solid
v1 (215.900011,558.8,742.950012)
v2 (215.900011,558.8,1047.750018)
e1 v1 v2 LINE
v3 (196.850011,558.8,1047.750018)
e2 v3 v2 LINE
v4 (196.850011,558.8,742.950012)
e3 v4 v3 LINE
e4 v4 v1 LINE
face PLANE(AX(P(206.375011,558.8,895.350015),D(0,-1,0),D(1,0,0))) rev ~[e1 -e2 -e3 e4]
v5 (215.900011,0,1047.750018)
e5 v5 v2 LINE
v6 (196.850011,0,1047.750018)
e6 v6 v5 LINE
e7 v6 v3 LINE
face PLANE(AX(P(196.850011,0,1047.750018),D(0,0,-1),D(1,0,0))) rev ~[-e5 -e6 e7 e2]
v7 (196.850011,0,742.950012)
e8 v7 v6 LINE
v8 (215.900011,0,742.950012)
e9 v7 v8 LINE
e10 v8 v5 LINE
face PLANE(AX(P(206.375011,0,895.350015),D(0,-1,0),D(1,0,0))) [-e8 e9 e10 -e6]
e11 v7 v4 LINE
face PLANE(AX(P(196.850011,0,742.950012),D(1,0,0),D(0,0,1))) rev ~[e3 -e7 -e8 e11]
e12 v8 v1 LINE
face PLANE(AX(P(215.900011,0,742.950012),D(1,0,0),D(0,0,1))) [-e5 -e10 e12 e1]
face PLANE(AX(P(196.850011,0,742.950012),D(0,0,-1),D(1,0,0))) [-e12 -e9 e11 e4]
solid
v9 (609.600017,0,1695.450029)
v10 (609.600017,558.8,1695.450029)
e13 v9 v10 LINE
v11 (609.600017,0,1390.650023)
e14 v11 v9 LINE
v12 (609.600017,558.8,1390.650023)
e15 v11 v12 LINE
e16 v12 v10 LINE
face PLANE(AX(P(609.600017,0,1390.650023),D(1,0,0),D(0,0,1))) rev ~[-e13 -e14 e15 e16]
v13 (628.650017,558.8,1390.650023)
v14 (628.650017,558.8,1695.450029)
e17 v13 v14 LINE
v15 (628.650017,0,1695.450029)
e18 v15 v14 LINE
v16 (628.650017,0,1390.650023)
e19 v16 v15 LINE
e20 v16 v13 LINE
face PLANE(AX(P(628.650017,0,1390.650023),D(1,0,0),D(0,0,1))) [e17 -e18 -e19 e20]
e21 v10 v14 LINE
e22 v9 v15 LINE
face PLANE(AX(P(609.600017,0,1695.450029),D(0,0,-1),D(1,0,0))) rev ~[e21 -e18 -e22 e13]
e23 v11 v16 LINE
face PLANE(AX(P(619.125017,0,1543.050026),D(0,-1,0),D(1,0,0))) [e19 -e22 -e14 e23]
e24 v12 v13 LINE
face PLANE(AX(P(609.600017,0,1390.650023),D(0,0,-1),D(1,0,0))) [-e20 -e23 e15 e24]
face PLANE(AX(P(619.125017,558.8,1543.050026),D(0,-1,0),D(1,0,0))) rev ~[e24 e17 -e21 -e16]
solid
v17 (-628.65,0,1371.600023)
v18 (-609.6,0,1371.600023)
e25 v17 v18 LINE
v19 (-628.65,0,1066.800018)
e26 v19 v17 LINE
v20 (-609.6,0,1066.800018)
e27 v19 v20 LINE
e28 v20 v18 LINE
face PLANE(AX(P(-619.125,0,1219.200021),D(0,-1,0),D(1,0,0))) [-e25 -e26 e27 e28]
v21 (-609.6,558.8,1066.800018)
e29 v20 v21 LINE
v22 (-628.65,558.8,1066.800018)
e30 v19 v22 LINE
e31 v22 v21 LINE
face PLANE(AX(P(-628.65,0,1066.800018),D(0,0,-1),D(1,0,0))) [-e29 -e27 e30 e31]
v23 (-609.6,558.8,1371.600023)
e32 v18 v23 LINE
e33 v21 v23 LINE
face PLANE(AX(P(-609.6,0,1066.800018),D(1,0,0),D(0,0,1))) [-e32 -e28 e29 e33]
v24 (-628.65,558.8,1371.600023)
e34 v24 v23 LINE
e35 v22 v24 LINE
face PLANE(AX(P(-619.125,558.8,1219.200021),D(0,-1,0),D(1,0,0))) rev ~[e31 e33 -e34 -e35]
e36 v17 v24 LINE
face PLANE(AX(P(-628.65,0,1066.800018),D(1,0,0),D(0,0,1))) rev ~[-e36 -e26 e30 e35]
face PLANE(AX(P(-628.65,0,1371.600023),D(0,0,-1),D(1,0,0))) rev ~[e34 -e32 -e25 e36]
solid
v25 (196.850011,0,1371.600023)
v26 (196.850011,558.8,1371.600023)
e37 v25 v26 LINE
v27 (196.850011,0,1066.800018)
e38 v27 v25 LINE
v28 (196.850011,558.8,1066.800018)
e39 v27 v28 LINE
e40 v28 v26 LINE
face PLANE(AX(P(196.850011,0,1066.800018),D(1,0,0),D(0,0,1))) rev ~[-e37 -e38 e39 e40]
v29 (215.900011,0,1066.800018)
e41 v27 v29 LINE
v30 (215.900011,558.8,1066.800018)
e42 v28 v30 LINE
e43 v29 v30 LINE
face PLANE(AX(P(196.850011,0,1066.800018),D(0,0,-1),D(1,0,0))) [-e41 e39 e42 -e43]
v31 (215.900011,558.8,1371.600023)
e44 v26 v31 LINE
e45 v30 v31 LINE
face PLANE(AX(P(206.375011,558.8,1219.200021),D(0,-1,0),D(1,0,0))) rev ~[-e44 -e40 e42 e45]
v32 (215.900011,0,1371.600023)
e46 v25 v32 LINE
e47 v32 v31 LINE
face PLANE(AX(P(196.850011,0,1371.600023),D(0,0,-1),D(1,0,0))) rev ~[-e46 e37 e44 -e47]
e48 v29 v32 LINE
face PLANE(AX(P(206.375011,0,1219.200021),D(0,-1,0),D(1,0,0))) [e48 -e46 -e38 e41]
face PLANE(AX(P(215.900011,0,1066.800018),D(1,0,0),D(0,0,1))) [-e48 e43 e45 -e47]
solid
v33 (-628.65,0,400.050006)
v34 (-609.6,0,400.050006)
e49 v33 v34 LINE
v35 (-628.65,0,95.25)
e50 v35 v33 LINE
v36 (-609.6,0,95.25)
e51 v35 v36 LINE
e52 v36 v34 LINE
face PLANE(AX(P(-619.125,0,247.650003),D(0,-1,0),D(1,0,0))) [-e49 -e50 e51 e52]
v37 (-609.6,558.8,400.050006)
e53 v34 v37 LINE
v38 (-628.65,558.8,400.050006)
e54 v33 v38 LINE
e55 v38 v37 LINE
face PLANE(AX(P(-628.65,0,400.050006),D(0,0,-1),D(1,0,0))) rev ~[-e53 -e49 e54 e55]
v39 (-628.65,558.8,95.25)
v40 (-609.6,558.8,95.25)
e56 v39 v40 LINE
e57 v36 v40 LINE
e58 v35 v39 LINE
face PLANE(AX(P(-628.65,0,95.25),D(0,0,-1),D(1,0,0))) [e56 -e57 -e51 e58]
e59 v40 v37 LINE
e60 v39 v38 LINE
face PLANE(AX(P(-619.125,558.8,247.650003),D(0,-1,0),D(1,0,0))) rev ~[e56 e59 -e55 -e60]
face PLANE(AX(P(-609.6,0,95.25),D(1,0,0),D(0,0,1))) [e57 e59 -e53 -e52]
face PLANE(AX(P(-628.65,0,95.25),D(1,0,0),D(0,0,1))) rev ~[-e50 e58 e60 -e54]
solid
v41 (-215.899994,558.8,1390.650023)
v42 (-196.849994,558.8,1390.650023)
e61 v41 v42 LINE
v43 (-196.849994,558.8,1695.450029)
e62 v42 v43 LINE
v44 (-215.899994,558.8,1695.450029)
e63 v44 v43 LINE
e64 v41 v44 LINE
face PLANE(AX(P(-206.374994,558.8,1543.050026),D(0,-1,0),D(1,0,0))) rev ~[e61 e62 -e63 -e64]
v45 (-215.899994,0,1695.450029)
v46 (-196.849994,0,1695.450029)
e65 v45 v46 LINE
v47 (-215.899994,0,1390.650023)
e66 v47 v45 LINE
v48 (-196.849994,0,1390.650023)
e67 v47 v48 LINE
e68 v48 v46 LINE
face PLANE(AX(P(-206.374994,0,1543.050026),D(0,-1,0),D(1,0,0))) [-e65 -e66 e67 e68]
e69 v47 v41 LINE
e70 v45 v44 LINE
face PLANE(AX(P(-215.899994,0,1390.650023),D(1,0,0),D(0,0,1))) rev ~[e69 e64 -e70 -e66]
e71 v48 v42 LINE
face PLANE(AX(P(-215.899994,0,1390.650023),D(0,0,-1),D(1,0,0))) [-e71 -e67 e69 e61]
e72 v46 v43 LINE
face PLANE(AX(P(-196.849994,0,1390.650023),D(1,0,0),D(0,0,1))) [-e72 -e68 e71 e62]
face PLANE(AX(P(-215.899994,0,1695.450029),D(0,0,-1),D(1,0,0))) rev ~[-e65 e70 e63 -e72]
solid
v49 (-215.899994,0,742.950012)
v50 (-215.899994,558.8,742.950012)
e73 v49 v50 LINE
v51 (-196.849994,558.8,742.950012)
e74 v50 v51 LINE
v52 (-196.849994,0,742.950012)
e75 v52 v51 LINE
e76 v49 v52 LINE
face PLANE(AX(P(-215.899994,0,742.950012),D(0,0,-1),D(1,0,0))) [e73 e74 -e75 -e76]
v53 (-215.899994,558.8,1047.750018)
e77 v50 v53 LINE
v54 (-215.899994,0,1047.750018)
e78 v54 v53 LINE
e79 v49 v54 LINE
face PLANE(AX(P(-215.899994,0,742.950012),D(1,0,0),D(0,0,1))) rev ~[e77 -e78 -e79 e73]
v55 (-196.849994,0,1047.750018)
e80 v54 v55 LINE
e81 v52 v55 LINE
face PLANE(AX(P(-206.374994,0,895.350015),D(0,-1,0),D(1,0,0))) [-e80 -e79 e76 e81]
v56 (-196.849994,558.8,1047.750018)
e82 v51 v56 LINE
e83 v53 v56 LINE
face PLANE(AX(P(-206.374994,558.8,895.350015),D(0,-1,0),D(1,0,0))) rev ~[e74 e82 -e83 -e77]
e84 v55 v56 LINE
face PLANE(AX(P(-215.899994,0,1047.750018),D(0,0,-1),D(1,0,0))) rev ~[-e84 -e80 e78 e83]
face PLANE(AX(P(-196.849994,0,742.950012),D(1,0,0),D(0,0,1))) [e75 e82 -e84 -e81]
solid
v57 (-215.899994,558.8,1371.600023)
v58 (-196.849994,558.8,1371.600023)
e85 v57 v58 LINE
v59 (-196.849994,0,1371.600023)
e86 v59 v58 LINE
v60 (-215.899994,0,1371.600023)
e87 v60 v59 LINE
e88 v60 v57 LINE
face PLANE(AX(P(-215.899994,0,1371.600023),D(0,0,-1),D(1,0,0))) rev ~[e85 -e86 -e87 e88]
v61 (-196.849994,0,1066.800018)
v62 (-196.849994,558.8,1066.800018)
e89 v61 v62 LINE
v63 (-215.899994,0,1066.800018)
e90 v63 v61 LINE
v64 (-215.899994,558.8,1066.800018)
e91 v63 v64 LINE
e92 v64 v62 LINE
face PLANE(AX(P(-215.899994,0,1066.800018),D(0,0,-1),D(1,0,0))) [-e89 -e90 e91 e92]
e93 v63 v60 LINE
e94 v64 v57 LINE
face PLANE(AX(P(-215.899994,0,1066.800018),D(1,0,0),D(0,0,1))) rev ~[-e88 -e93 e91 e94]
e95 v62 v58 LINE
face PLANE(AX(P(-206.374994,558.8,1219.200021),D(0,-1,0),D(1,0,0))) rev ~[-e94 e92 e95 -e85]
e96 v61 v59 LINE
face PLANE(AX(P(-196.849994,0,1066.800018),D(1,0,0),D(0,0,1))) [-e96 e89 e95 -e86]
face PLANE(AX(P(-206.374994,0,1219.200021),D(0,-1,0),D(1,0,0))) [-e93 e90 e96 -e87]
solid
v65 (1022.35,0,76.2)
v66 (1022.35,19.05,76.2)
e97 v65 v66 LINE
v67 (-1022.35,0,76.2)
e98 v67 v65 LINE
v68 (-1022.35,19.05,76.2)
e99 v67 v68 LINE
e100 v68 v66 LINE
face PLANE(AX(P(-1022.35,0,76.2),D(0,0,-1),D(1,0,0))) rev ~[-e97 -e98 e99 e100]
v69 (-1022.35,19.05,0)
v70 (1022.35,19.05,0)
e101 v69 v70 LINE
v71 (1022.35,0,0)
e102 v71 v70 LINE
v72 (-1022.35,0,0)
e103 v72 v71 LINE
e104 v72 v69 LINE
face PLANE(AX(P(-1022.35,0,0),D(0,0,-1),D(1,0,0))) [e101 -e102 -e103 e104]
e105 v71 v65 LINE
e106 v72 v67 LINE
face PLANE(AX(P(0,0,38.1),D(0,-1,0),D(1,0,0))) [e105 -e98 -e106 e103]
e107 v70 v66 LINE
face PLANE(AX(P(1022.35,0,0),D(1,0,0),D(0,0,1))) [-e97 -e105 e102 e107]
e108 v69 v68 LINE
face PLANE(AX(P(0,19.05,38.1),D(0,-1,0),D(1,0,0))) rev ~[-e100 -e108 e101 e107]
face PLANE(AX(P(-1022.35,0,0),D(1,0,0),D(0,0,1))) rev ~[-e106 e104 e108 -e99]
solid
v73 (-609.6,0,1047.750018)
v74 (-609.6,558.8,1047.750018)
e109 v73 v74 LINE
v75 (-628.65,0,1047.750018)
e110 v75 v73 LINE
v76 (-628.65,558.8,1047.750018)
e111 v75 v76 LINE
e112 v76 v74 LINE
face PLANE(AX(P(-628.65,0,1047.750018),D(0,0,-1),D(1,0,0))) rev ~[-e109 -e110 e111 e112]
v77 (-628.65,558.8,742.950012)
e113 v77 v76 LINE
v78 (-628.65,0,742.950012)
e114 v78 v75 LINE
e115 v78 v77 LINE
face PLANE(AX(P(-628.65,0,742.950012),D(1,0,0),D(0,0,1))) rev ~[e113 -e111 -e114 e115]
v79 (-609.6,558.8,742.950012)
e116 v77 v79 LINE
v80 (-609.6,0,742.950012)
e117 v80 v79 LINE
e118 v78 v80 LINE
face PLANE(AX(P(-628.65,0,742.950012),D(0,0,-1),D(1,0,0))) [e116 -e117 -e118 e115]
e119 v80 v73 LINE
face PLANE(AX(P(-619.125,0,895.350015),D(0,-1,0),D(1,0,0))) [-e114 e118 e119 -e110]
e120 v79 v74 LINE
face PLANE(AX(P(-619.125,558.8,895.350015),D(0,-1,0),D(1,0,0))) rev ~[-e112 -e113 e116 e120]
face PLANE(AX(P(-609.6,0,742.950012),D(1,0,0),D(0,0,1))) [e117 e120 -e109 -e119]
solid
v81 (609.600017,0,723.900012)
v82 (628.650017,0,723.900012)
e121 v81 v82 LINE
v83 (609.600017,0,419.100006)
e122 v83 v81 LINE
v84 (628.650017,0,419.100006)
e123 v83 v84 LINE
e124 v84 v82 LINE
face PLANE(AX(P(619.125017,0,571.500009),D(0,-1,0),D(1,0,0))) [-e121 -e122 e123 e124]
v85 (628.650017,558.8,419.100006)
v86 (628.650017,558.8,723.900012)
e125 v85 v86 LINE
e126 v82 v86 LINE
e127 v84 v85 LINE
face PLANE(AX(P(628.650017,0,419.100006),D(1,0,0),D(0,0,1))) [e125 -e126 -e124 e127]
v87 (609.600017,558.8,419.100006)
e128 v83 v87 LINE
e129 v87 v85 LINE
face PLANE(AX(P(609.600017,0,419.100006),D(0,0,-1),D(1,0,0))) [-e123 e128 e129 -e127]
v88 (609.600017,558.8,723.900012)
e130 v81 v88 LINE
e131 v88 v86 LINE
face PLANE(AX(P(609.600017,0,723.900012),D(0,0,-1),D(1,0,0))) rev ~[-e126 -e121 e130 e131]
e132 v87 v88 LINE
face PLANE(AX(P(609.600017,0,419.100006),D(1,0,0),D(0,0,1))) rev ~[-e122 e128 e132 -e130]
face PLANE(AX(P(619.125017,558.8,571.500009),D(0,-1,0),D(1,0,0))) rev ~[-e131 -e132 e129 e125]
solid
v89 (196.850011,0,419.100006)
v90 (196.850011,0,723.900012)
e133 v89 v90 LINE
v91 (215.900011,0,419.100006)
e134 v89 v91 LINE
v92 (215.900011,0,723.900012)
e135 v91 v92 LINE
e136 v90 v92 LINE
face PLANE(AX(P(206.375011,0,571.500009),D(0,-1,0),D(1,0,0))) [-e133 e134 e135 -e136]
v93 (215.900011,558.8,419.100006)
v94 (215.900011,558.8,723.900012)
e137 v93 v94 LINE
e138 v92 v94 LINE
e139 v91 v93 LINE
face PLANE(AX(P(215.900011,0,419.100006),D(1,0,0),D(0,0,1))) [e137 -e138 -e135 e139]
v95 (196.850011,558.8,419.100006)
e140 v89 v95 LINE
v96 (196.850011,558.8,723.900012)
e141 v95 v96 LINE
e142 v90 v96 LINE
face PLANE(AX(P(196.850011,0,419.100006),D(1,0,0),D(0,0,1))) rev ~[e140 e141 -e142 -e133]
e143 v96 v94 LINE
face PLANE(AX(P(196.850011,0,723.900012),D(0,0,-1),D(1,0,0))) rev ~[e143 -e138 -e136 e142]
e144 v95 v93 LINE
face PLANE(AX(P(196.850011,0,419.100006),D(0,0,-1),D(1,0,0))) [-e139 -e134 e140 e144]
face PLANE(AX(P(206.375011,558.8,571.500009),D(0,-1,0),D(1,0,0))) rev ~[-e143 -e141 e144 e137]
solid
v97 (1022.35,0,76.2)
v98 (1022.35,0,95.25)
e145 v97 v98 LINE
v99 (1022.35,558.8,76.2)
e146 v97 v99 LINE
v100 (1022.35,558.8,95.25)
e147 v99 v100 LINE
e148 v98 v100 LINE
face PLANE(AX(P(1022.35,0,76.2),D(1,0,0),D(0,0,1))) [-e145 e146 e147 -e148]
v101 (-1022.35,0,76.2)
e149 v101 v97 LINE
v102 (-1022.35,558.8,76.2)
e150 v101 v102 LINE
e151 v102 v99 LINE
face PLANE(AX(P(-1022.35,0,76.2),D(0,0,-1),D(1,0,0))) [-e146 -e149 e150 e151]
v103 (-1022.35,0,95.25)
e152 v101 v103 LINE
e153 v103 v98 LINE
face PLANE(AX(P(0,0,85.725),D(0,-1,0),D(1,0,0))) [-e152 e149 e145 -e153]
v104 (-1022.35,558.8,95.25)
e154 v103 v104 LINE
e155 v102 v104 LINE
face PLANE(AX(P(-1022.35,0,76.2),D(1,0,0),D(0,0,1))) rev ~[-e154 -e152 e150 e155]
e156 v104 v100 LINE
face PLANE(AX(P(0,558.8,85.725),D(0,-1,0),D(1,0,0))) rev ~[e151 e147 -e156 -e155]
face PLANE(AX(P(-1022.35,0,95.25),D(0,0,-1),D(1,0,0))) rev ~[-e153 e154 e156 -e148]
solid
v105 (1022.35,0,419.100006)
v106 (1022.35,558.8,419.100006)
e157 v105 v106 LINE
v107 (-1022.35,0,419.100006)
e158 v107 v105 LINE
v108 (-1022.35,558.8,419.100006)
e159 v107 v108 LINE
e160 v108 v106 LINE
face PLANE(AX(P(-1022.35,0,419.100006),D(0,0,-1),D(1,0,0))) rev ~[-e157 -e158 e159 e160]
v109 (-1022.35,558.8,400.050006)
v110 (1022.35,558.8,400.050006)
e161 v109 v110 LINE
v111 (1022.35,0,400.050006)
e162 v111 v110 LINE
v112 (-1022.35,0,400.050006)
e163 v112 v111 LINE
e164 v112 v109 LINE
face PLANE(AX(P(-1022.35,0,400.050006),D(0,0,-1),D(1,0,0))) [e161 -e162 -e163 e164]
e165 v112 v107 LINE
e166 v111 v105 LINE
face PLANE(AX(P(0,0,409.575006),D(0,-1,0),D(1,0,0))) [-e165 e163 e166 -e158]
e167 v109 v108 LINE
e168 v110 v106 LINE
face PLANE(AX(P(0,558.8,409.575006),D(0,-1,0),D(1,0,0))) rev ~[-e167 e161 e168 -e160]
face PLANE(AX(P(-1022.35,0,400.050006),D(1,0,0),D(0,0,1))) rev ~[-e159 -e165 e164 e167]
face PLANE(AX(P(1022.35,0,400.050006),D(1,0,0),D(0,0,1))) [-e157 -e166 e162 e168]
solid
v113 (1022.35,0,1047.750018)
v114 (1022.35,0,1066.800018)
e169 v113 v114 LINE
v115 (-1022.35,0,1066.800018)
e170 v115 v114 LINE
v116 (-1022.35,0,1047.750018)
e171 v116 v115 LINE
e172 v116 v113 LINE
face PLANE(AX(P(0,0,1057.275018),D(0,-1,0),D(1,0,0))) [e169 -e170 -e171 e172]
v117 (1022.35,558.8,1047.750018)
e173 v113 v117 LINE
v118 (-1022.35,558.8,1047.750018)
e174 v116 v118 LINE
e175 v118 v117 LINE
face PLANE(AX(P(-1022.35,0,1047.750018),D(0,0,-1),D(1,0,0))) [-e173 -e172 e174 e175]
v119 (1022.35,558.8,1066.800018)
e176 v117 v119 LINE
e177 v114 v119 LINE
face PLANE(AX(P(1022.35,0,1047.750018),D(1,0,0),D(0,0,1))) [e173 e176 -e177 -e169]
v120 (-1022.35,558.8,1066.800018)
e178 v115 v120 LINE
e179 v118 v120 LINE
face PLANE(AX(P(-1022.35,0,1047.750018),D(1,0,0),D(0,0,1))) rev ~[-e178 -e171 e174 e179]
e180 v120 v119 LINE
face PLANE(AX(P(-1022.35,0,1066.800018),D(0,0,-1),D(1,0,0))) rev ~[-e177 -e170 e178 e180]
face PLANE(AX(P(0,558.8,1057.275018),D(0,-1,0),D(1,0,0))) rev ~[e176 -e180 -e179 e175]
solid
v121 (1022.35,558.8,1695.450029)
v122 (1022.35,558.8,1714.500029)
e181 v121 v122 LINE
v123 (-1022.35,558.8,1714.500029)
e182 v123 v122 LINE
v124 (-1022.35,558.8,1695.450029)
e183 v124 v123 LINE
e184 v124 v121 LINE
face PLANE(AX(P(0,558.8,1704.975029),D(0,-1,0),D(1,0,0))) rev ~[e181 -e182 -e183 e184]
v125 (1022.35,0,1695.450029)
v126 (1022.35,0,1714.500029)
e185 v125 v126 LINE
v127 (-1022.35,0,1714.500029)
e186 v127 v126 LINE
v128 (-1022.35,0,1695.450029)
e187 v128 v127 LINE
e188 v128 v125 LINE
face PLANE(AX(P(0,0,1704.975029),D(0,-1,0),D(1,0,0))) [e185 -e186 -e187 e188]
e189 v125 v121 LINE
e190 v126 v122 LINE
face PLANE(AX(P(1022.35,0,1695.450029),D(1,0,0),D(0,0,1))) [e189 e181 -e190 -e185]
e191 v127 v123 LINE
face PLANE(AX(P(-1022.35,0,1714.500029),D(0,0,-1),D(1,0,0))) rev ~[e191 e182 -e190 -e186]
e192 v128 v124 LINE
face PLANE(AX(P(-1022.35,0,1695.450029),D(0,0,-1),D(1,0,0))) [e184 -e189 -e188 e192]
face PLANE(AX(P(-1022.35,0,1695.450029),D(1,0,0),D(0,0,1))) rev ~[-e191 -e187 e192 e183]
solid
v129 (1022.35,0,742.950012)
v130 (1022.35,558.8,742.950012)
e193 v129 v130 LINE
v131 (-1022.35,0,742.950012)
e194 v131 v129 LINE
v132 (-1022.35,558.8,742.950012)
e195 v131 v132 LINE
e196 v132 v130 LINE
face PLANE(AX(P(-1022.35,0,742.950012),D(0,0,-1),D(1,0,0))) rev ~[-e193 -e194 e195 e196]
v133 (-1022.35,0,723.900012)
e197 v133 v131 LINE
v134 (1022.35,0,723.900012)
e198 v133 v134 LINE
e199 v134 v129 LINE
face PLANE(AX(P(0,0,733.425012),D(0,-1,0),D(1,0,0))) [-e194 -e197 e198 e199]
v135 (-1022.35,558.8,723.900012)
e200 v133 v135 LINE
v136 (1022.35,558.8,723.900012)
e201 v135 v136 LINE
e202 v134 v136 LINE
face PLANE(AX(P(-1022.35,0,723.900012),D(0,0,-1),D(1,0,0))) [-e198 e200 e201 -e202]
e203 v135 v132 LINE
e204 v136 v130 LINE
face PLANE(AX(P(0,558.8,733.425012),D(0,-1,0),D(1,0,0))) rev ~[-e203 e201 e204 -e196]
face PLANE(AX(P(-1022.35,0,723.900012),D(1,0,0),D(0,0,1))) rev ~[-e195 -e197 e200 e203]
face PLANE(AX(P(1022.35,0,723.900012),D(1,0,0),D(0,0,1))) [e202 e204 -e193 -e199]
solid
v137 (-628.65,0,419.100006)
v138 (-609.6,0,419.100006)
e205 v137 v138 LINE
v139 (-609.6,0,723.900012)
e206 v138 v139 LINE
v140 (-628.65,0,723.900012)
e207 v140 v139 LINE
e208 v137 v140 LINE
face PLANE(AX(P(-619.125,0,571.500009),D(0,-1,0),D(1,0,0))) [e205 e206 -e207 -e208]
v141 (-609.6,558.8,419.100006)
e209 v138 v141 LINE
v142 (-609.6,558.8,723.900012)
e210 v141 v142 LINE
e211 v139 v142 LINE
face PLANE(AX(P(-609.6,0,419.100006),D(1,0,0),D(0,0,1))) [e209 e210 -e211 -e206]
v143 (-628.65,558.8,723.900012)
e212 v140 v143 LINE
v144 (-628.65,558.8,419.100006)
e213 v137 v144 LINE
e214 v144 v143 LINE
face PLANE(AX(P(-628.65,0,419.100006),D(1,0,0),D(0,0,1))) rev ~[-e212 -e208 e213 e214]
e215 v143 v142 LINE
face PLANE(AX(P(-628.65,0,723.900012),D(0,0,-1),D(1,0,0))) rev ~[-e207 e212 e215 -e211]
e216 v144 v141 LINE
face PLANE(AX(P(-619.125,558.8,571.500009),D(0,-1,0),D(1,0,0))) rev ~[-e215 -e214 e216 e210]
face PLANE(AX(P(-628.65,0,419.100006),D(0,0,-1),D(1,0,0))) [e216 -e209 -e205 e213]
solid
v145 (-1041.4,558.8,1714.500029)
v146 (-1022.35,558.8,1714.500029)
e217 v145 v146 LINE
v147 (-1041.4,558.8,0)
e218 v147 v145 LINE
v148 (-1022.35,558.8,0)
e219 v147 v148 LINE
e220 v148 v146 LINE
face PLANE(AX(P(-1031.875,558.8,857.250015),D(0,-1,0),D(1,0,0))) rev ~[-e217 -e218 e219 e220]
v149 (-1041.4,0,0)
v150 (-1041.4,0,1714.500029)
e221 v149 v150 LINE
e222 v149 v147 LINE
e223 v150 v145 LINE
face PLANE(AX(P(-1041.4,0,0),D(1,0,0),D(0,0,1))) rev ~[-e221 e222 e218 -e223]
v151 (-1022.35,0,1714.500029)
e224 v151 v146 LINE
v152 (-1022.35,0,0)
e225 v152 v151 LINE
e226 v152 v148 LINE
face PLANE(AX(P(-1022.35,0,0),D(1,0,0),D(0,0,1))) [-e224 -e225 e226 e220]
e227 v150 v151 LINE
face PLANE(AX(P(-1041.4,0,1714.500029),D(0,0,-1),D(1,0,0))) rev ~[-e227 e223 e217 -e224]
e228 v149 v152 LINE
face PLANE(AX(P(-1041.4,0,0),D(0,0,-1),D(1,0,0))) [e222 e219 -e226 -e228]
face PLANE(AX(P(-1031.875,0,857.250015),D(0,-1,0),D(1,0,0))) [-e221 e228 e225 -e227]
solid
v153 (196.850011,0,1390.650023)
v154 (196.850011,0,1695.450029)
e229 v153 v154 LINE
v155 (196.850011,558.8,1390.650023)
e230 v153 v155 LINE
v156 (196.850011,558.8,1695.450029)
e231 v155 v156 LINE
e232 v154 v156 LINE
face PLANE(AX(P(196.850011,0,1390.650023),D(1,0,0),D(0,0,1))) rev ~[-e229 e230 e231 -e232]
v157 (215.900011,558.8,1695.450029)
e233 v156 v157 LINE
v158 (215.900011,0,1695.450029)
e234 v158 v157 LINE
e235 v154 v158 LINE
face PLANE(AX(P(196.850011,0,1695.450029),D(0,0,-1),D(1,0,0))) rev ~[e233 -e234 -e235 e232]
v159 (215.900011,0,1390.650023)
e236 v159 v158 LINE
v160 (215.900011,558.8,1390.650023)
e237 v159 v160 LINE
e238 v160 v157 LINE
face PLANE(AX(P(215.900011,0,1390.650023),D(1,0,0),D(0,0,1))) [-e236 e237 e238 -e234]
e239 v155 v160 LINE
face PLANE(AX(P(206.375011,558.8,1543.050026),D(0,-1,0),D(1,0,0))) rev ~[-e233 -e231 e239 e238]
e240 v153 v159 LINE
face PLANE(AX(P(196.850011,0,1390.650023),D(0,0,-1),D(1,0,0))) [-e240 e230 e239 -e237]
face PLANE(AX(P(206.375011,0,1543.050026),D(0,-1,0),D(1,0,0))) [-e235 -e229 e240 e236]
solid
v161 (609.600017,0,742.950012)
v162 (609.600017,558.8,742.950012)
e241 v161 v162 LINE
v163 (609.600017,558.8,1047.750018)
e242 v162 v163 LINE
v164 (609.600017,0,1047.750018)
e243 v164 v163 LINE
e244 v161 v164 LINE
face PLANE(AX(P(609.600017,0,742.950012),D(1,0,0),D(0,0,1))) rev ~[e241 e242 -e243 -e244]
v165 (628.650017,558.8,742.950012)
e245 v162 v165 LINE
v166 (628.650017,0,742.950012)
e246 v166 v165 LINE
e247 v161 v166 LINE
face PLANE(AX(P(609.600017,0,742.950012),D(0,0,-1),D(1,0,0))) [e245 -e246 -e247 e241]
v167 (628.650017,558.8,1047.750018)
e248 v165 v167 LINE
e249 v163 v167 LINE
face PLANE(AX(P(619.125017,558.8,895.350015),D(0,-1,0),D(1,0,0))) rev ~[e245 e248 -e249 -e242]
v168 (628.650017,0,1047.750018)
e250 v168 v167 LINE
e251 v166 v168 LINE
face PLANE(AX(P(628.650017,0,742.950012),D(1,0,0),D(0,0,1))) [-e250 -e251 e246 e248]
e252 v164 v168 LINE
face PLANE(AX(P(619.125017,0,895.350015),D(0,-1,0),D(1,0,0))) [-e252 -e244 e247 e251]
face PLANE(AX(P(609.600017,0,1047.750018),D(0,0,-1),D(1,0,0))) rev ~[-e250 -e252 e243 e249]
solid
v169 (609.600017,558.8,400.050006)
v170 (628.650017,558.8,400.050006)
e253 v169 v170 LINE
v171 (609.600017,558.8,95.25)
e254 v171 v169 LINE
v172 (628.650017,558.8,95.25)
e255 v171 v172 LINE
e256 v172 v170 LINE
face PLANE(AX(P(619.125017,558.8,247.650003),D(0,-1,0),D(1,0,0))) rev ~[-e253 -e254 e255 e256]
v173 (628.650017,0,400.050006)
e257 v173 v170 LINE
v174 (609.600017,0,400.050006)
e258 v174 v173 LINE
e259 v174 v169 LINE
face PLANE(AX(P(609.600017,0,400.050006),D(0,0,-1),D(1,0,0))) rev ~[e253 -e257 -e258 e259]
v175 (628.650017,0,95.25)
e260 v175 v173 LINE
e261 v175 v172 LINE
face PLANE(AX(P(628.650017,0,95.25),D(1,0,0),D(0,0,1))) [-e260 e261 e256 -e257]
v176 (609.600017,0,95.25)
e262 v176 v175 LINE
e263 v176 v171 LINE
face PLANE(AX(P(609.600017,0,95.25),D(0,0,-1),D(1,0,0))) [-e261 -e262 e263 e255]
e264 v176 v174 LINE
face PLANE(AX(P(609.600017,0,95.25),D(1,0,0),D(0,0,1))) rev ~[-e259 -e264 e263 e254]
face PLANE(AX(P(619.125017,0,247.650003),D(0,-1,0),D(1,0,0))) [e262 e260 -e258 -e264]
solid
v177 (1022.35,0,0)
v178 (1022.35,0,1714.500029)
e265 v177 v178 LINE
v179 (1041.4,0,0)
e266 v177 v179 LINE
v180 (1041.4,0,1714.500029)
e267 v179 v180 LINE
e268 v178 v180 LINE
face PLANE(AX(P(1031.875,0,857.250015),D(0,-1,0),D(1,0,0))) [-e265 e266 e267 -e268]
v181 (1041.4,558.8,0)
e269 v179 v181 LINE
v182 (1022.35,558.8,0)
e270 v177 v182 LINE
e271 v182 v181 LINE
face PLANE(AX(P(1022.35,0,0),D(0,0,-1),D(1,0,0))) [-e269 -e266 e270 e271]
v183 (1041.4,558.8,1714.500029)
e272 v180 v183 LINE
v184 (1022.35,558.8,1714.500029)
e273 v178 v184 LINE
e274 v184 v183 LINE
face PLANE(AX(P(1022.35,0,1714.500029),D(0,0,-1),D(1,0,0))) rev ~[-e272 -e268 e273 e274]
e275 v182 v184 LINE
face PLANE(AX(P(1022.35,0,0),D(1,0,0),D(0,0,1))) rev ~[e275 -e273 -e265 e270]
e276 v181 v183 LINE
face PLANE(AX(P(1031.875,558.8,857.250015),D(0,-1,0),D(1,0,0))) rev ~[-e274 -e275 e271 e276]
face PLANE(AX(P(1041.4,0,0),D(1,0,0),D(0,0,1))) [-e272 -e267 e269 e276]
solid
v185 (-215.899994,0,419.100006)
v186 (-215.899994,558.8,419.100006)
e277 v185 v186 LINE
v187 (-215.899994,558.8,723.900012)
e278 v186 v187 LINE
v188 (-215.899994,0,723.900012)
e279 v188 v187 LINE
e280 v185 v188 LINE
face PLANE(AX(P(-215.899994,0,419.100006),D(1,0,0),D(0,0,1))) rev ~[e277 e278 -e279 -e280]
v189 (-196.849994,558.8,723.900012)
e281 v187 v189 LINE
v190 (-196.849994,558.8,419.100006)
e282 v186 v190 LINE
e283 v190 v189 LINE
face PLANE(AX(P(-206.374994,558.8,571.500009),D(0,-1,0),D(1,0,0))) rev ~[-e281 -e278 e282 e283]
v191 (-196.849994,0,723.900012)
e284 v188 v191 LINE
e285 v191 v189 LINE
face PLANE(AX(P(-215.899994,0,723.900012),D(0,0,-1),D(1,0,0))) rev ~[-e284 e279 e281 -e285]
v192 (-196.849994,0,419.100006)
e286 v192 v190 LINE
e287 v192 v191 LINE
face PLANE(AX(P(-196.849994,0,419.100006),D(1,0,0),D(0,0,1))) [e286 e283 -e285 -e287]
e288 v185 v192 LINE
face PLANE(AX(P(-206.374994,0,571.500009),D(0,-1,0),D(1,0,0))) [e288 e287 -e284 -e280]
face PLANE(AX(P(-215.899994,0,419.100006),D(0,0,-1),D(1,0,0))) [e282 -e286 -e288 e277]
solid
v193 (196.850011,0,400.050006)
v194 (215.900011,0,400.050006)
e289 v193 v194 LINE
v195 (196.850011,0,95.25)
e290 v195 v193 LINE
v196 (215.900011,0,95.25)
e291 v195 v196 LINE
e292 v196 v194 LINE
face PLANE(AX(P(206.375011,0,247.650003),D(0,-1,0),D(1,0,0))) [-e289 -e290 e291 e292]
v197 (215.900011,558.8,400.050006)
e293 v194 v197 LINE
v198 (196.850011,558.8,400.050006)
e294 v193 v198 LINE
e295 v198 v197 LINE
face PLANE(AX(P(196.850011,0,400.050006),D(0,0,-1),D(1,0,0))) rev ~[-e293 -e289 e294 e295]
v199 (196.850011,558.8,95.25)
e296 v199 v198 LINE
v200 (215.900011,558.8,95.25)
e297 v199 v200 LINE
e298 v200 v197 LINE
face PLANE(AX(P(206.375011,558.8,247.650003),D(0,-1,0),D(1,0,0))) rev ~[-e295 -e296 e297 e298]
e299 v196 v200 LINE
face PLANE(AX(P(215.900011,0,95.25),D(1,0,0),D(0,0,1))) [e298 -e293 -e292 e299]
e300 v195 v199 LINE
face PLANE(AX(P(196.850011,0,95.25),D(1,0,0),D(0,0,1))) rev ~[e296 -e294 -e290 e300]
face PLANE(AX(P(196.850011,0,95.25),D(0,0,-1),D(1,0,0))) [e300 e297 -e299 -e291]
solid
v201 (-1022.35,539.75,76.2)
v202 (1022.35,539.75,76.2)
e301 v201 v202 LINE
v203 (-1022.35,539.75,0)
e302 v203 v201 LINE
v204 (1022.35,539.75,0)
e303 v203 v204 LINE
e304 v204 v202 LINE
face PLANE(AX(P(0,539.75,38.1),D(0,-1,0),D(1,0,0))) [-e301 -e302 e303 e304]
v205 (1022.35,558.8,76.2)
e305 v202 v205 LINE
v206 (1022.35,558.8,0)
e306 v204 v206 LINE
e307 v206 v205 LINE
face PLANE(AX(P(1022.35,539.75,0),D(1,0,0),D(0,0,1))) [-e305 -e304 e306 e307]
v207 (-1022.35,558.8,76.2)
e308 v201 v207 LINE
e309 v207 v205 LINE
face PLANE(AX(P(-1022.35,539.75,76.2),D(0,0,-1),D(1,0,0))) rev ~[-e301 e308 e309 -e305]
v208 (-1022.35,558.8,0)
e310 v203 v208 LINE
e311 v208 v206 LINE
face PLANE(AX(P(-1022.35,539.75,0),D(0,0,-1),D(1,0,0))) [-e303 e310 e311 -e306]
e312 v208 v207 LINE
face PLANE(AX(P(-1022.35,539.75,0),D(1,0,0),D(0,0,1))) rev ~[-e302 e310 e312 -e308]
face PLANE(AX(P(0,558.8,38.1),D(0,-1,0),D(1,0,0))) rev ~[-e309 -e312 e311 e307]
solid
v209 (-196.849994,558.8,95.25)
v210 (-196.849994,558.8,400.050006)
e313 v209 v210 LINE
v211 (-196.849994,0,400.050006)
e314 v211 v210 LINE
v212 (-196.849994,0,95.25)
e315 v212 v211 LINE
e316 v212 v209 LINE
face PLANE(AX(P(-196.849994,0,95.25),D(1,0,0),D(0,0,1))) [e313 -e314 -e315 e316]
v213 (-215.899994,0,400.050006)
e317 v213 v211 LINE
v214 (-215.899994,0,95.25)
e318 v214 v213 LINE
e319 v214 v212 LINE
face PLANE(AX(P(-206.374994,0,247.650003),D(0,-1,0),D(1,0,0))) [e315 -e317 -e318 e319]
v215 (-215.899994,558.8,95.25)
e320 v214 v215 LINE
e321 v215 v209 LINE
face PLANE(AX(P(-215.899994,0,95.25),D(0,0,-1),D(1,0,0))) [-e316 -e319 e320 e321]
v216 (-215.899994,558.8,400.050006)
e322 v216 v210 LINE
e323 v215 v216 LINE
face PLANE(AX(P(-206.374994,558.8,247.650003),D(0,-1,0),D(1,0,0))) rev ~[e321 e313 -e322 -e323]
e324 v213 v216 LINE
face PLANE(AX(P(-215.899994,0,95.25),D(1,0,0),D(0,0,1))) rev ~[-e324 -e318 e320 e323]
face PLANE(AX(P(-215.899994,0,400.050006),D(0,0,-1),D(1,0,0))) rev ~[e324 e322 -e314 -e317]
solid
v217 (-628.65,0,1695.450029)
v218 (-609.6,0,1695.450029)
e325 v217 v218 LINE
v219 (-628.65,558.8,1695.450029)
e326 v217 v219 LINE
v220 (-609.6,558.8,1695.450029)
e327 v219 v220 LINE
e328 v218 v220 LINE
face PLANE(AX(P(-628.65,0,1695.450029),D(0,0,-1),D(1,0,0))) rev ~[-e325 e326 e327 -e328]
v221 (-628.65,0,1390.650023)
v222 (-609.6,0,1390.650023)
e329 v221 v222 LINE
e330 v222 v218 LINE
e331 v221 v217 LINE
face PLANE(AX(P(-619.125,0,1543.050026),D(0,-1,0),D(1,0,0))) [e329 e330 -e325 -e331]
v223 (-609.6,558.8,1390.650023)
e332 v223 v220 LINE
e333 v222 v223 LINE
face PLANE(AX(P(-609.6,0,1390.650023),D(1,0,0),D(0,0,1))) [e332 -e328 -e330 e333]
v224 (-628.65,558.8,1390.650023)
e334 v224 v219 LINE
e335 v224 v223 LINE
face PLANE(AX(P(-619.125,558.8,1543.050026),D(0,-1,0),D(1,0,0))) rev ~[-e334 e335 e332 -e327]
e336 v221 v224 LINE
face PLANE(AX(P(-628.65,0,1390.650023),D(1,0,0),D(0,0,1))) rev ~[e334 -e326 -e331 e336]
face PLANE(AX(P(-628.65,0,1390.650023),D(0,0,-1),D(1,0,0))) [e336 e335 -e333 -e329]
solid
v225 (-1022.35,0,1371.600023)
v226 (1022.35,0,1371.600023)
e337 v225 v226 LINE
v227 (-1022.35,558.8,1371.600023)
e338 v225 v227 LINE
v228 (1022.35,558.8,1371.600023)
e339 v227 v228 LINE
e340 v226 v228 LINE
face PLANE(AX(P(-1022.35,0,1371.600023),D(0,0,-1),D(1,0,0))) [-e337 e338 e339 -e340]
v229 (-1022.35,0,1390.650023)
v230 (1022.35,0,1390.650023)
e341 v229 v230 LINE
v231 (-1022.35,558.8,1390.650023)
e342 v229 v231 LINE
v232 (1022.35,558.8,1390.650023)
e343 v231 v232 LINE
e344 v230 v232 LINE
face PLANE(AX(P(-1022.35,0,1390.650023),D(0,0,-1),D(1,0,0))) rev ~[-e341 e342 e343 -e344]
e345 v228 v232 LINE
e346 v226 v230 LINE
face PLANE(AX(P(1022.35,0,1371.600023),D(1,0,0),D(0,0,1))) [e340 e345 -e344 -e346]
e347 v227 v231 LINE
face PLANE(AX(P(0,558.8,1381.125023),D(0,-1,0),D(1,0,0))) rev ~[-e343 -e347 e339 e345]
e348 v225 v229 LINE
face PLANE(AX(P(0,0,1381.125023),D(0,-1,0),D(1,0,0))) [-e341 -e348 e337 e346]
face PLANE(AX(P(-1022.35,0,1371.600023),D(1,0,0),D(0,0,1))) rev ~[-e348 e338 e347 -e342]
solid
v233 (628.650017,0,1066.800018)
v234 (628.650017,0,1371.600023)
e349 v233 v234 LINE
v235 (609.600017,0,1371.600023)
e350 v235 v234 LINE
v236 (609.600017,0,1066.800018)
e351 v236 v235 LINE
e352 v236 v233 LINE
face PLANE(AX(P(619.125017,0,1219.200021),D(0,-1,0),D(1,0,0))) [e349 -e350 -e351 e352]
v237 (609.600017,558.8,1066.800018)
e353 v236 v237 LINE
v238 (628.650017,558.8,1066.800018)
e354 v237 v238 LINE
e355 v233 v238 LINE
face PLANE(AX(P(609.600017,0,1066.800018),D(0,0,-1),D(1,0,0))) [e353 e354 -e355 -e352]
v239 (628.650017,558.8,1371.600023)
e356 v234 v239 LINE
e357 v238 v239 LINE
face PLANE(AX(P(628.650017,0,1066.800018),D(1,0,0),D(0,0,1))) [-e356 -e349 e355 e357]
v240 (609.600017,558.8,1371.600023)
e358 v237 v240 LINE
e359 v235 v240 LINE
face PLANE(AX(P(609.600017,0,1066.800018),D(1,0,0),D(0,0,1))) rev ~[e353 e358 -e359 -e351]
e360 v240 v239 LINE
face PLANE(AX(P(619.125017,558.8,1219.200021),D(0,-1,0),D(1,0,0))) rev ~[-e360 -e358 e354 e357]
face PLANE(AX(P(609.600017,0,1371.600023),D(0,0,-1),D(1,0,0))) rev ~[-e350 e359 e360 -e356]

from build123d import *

# Parameters (mm, degrees)
F2_W      = 2044.7
F2_H      = 76.2
F6_DEPTH  = 19.05
F7_START  = -539.75
F7_DEPTH  = 19.05
F3_W      = 2044.7
F3_H      = 19.05
F8_DEPTH  = 558.8
F4_W      = 19.05
F4_H      = 1714.5000293255
F9_DEPTH  = 558.8
F5_W      = 19.05
F5_H      = 304.8000058651
F10_DEPTH = 558.8


# Not quite as in the source:
# - a variable given as a bare number and used for a length is read in inches; the dataset says mm whatever the document's units were


with BuildPart() as f6:
    # F2 (on Front) → F6 (new body)
    with BuildSketch(Plane.XZ):
        with Locations((0, 38.1)):
            Rectangle(F2_W, F2_H)
    extrude(amount=-F6_DEPTH)


with BuildPart() as f7:
    # F2 (on Front) → F7 (new body)
    with BuildSketch(Plane.XZ.offset(F7_START)):
        with Locations((0, 38.1)):
            Rectangle(F2_W, F2_H)
    extrude(amount=-F7_DEPTH)


with BuildPart() as f8:
    # F3 (on Front) → F8 (new body)
    with BuildSketch(Plane.XZ):
        with Locations((0, 85.725)):
            Rectangle(F3_W, F3_H)
    extrude(amount=-F8_DEPTH)


with BuildPart() as f8b:
    # F3 (on Front) → F8, piece 2 (new body)
    with BuildSketch(Plane.XZ):
        with Locations((0, 409.5750058651)):
            Rectangle(F3_W, F3_H)
    extrude(amount=-F8_DEPTH)


with BuildPart() as f8c:
    # F3 (on Front) → F8, piece 3 (new body)
    with BuildSketch(Plane.XZ):
        with Locations((0, 733.4250117302)):
            Rectangle(F3_W, F3_H)
    extrude(amount=-F8_DEPTH)


with BuildPart() as f8d:
    # F3 (on Front) → F8, piece 4 (new body)
    with BuildSketch(Plane.XZ):
        with Locations((0, 1057.2750175953)):
            Rectangle(F3_W, F3_H)
    extrude(amount=-F8_DEPTH)


with BuildPart() as f8e:
    # F3 (on Front) → F8, piece 5 (new body)
    with BuildSketch(Plane.XZ):
        with Locations((0, 1381.1250234604)):
            Rectangle(F3_W, F3_H)
    extrude(amount=-F8_DEPTH)


with BuildPart() as f8f:
    # F3 (on Front) → F8, piece 6 (new body)
    with BuildSketch(Plane.XZ):
        with Locations((0, 1704.9750293255)):
            Rectangle(F3_W, F3_H)
    extrude(amount=-F8_DEPTH)


with BuildPart() as f9:
    # F4 (on Front) → F9 (new body)
    with BuildSketch(Plane.XZ):
        with Locations((-1031.875, 857.2500146627)):
            Rectangle(F4_W, F4_H)
    extrude(amount=-F9_DEPTH)


with BuildPart() as f9b:
    # F4 (on Front) → F9, piece 2 (new body)
    with BuildSketch(Plane.XZ):
        with Locations((1031.875, 857.2500146627)):
            Rectangle(F4_W, F4_H)
    extrude(amount=-F9_DEPTH)


with BuildPart() as f10:
    # F5 (on Front) → F10 (new body)
    with BuildSketch(Plane.XZ):
        with Locations((-619.125, 247.6500029325)):
            Rectangle(F5_W, F5_H)
    extrude(amount=-F10_DEPTH)


with BuildPart() as f10b:
    # F5 (on Front) → F10, piece 2 (new body)
    with BuildSketch(Plane.XZ):
        with Locations((-619.125, 571.5000087976)):
            Rectangle(F5_W, F5_H)
    extrude(amount=-F10_DEPTH)


with BuildPart() as f10c:
    # F5 (on Front) → F10, piece 3 (new body)
    with BuildSketch(Plane.XZ):
        with Locations((-619.125, 895.3500146627)):
            Rectangle(F5_W, F5_H)
    extrude(amount=-F10_DEPTH)


with BuildPart() as f10d:
    # F5 (on Front) → F10, piece 4 (new body)
    with BuildSketch(Plane.XZ):
        with Locations((-619.125, 1219.2000205278)):
            Rectangle(F5_W, F5_H)
    extrude(amount=-F10_DEPTH)


with BuildPart() as f10e:
    # F5 (on Front) → F10, piece 5 (new body)
    with BuildSketch(Plane.XZ):
        with Locations((-619.125, 1543.0500263929)):
            Rectangle(F5_W, F5_H)
    extrude(amount=-F10_DEPTH)


with BuildPart() as f10f:
    # F5 (on Front) → F10, piece 6 (new body)
    with BuildSketch(Plane.XZ):
        with Locations((-206.374994278, 247.6500029325)):
            Rectangle(F5_W, F5_H)
    extrude(amount=-F10_DEPTH)


with BuildPart() as f10g:
    # F5 (on Front) → F10, piece 7 (new body)
    with BuildSketch(Plane.XZ):
        with Locations((-206.374994278, 571.5000087976)):
            Rectangle(F5_W, F5_H)
    extrude(amount=-F10_DEPTH)


with BuildPart() as f10h:
    # F5 (on Front) → F10, piece 8 (new body)
    with BuildSketch(Plane.XZ):
        with Locations((-206.374994278, 895.3500146627)):
            Rectangle(F5_W, F5_H)
    extrude(amount=-F10_DEPTH)


with BuildPart() as f10i:
    # F5 (on Front) → F10, piece 9 (new body)
    with BuildSketch(Plane.XZ):
        with Locations((-206.374994278, 1219.2000205278)):
            Rectangle(F5_W, F5_H)
    extrude(amount=-F10_DEPTH)


with BuildPart() as f10j:
    # F5 (on Front) → F10, piece 10 (new body)
    with BuildSketch(Plane.XZ):
        with Locations((-206.374994278, 1543.0500263929)):
            Rectangle(F5_W, F5_H)
    extrude(amount=-F10_DEPTH)


with BuildPart() as f10k:
    # F5 (on Front) → F10, piece 11 (new body)
    with BuildSketch(Plane.XZ):
        with Locations((206.3750114441, 247.6500029325)):
            Rectangle(F5_W, F5_H)
    extrude(amount=-F10_DEPTH)


with BuildPart() as f10l:
    # F5 (on Front) → F10, piece 12 (new body)
    with BuildSketch(Plane.XZ):
        with Locations((206.3750114441, 571.5000087976)):
            Rectangle(F5_W, F5_H)
    extrude(amount=-F10_DEPTH)


with BuildPart() as f10m:
    # F5 (on Front) → F10, piece 13 (new body)
    with BuildSketch(Plane.XZ):
        with Locations((206.3750114441, 895.3500146627)):
            Rectangle(F5_W, F5_H)
    extrude(amount=-F10_DEPTH)


with BuildPart() as f10n:
    # F5 (on Front) → F10, piece 14 (new body)
    with BuildSketch(Plane.XZ):
        with Locations((206.3750114441, 1219.2000205278)):
            Rectangle(F5_W, F5_H)
    extrude(amount=-F10_DEPTH)


with BuildPart() as f10o:
    # F5 (on Front) → F10, piece 15 (new body)
    with BuildSketch(Plane.XZ):
        with Locations((206.3750114441, 1543.0500263929)):
            Rectangle(F5_W, F5_H)
    extrude(amount=-F10_DEPTH)


with BuildPart() as f10p:
    # F5 (on Front) → F10, piece 16 (new body)
    with BuildSketch(Plane.XZ):
        with Locations((619.1250171661, 247.6500029325)):
            Rectangle(F5_W, F5_H)
    extrude(amount=-F10_DEPTH)


with BuildPart() as f10q:
    # F5 (on Front) → F10, piece 17 (new body)
    with BuildSketch(Plane.XZ):
        with Locations((619.1250171661, 571.5000087976)):
            Rectangle(F5_W, F5_H)
    extrude(amount=-F10_DEPTH)


with BuildPart() as f10r:
    # F5 (on Front) → F10, piece 18 (new body)
    with BuildSketch(Plane.XZ):
        with Locations((619.1250171661, 895.3500146627)):
            Rectangle(F5_W, F5_H)
    extrude(amount=-F10_DEPTH)


with BuildPart() as f10s:
    # F5 (on Front) → F10, piece 19 (new body)
    with BuildSketch(Plane.XZ):
        with Locations((619.1250171661, 1219.2000205278)):
            Rectangle(F5_W, F5_H)
    extrude(amount=-F10_DEPTH)


with BuildPart() as f10t:
    # F5 (on Front) → F10, piece 20 (new body)
    with BuildSketch(Plane.XZ):
        with Locations((619.1250171661, 1543.0500263929)):
            Rectangle(F5_W, F5_H)
    extrude(amount=-F10_DEPTH)


solid = Compound([f6.part, f7.part, f8.part, f8b.part, f8c.part, f8d.part, f8e.part, f8f.part, f9.part, f9b.part, f10.part, f10b.part, f10c.part, f10d.part, f10e.part, f10f.part, f10g.part, f10h.part, f10i.part, f10j.part, f10k.part, f10l.part, f10m.part, f10n.part, f10o.part, f10p.part, f10q.part, f10r.part, f10s.part, f10t.part])
